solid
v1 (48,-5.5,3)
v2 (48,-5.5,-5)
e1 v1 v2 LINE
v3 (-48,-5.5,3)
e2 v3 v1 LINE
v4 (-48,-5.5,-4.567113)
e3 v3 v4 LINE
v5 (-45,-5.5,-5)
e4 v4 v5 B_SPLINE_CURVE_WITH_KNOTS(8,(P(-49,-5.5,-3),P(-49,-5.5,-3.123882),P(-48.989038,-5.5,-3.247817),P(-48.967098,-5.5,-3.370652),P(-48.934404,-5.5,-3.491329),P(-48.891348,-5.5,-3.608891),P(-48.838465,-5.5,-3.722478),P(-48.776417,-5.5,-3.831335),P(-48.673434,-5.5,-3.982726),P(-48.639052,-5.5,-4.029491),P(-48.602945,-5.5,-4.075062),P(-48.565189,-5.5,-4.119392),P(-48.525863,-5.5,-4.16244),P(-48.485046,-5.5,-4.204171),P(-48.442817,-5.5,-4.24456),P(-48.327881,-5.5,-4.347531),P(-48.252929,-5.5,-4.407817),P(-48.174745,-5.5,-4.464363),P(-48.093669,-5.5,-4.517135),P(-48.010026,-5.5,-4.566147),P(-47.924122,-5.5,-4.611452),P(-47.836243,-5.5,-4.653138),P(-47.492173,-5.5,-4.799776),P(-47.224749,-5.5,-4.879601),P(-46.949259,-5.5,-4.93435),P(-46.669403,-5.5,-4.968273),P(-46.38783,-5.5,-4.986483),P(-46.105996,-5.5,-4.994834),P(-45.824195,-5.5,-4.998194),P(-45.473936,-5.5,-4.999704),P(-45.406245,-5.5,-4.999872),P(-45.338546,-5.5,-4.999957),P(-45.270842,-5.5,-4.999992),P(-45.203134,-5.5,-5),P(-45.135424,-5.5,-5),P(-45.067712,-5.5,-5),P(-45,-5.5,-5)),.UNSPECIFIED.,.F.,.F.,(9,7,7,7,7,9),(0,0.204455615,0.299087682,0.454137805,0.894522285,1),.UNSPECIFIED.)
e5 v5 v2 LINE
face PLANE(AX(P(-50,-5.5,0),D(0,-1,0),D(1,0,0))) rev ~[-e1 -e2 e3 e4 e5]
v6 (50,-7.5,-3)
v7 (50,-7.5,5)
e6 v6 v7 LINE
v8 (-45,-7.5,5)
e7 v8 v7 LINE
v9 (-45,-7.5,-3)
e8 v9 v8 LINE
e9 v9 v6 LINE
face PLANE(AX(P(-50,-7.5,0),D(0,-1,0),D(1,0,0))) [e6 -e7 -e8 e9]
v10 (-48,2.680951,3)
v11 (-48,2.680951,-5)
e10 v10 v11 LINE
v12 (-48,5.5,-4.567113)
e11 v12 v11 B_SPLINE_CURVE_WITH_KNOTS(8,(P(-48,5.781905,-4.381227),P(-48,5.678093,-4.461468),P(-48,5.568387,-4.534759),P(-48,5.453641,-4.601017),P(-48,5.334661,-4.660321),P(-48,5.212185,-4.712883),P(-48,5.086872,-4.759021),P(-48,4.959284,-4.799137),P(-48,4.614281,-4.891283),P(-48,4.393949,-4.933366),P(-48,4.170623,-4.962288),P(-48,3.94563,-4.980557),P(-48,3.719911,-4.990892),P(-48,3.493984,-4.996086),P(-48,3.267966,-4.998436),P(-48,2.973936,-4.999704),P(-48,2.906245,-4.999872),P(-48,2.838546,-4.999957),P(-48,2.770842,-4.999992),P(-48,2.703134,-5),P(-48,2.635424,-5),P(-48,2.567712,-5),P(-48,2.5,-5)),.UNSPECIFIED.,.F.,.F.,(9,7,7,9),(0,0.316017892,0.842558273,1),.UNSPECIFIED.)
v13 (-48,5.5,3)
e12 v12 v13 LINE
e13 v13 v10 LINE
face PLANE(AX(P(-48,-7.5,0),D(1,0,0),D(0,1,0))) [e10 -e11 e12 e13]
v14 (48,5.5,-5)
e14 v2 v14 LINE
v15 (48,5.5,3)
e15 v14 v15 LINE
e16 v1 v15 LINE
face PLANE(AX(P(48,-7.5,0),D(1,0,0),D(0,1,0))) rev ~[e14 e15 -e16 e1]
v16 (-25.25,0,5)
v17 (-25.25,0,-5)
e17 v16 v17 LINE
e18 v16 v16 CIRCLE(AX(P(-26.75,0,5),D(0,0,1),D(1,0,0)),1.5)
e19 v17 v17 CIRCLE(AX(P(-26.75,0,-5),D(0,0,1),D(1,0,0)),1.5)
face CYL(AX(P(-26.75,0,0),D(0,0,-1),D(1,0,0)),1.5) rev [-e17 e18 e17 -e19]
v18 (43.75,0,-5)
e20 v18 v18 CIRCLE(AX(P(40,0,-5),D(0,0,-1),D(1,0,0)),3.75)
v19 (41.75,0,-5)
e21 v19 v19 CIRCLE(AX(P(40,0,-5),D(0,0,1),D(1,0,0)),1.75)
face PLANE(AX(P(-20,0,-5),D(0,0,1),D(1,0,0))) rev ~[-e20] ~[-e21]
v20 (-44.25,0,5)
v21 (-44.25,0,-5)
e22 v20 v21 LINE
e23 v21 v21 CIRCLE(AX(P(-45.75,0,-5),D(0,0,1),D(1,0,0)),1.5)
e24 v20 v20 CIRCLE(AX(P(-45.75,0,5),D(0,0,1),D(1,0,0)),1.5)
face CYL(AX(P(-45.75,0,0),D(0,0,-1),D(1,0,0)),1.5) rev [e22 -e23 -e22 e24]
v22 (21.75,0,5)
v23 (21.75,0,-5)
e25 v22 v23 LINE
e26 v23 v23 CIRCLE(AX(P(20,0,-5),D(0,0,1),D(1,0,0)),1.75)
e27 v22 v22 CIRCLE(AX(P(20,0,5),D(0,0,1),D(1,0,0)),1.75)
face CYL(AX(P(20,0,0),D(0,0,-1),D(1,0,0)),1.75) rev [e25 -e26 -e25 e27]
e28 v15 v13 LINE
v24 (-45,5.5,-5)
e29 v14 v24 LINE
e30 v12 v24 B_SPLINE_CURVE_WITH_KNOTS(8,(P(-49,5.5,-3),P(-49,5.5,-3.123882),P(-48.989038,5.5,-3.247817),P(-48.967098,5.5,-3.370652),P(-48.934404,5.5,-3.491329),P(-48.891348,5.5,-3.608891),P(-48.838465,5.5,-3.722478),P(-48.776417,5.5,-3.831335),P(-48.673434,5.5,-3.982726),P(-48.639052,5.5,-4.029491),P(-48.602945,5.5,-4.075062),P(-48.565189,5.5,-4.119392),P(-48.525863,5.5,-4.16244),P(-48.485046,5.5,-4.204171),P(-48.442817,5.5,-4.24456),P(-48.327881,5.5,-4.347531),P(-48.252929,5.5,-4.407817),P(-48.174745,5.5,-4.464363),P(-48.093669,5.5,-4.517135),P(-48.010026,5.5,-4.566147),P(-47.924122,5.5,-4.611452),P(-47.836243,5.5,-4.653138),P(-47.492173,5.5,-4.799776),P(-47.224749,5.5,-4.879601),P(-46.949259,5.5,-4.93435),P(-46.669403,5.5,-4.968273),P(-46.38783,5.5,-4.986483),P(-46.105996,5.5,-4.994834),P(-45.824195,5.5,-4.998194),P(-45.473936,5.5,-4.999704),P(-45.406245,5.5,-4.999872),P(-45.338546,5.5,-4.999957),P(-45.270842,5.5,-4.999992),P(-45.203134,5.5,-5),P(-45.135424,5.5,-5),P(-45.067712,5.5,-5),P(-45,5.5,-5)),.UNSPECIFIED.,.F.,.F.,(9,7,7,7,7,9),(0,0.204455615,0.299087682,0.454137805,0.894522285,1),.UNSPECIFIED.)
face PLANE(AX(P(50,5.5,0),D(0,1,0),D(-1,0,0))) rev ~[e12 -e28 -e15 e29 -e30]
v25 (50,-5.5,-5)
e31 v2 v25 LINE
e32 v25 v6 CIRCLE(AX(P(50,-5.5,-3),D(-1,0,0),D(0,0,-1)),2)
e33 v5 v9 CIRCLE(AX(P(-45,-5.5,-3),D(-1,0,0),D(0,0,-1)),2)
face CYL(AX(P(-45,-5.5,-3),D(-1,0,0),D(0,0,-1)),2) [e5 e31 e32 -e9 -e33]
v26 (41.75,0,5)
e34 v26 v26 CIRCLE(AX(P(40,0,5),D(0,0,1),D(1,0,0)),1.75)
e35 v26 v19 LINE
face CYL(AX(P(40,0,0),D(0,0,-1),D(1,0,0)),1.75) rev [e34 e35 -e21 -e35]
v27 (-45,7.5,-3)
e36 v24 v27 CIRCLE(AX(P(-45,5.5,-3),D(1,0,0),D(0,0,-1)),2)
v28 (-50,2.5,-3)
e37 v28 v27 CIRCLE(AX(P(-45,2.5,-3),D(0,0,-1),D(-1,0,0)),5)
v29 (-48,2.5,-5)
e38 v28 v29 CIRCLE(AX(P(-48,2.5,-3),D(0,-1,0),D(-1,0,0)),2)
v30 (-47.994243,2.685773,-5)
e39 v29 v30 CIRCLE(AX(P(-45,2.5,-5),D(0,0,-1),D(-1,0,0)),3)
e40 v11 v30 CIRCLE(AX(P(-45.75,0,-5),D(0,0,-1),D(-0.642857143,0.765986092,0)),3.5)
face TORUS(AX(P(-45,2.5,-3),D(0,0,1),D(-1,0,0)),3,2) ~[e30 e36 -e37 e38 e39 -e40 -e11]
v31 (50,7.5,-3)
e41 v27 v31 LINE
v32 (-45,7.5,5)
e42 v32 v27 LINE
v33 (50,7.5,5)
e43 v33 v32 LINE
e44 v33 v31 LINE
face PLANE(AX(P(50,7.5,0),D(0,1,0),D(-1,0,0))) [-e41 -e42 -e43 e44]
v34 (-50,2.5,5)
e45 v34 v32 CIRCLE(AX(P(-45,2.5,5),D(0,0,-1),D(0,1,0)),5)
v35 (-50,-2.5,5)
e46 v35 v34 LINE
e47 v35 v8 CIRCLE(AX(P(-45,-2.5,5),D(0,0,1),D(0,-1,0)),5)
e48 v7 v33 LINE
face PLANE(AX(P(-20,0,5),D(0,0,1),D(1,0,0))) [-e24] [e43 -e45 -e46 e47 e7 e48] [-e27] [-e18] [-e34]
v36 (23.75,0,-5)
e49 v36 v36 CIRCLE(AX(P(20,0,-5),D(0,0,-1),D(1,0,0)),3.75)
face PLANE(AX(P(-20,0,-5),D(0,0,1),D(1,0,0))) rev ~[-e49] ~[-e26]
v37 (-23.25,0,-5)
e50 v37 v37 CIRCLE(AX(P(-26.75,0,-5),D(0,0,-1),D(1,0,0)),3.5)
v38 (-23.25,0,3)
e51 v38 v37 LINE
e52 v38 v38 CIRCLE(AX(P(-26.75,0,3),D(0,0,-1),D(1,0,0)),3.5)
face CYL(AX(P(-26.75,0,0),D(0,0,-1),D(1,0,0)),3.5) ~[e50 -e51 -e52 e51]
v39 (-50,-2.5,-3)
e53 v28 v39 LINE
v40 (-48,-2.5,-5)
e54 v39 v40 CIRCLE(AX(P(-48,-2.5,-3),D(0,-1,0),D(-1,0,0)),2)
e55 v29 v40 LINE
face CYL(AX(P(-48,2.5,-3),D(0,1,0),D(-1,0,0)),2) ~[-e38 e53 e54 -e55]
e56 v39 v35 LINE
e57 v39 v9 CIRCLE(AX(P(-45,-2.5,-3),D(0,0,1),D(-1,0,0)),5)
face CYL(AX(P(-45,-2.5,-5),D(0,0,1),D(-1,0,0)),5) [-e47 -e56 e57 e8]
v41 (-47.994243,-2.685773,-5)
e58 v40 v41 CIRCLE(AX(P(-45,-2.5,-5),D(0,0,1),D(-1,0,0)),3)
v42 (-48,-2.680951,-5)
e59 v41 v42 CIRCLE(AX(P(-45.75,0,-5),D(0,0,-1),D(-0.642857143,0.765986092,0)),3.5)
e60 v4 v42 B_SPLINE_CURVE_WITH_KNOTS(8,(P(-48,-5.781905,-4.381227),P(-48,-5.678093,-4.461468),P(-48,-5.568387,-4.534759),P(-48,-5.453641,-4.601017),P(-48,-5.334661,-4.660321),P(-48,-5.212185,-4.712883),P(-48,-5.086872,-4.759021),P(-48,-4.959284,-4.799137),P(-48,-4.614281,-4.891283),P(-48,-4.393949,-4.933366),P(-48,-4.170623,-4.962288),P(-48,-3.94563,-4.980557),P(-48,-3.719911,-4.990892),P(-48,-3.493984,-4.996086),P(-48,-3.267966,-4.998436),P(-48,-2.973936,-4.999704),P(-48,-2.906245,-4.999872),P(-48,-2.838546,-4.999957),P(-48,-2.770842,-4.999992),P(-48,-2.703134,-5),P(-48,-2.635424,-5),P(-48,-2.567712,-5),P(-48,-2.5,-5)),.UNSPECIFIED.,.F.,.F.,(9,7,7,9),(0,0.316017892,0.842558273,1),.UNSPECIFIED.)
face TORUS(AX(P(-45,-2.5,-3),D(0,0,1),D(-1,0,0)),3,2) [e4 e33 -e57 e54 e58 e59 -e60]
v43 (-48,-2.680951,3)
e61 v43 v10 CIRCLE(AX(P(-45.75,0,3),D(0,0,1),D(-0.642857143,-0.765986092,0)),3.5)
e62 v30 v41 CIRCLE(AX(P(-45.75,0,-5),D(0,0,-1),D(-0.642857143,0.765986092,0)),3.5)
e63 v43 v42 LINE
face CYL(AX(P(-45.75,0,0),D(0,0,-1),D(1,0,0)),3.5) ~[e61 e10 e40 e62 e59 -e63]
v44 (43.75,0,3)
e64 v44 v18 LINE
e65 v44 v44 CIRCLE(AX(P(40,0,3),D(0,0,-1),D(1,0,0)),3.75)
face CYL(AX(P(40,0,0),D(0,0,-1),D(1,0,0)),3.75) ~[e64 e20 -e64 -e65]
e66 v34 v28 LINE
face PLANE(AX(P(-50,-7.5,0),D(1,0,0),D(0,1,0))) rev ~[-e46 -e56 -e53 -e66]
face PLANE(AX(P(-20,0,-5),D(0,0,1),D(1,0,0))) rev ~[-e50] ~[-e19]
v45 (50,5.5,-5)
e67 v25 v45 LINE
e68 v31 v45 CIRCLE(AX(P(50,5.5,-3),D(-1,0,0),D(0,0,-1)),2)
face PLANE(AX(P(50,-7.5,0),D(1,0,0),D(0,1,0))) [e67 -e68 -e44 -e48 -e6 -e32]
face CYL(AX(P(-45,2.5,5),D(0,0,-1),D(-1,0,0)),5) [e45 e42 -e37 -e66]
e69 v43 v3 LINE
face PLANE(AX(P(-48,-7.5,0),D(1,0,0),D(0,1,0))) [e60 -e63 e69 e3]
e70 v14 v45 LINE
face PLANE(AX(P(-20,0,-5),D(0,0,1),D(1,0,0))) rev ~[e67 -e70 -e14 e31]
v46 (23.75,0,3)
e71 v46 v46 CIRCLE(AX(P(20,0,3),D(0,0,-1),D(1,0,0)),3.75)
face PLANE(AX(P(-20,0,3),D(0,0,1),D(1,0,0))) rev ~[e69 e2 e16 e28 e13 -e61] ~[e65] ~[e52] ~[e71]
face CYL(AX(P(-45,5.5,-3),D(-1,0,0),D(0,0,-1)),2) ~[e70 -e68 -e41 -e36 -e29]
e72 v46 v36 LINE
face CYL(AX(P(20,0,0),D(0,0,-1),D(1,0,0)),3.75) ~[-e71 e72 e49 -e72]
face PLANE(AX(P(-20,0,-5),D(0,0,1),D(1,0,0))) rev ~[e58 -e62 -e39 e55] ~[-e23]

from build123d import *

# Parameters (mm, degrees)
F0_W        = 60
F0_H        = 15
F0_R        = 1.5
F0_W_2      = 40
F0_R_2      = 1.75
F1_DEPTH    = 5
F2_T        = -2
F3_R        = 5
F4_R        = 5
F5_T1_DEPTH = 100
F5_T3_DEPTH = 5
F5_T6_ANGLE = 90
F5_T8_ANGLE = 90


# Not quite as in the source:
# - a fillet or chamfer that OpenCascade refuses, or shapes differently, is made with other operations: its cross-section is extruded or revolved along the edge and cut away or added


with BuildPart() as f1:
    # F0 (on Top) → F1 (new body, symmetric)
    with BuildSketch(Plane.XY):
        with Locations((-20, 0)):
            Rectangle(F0_W, F0_H)
        with Locations((-45.75, 0)):
            Circle(F0_R, mode=Mode.SUBTRACT)
        with Locations((-26.75, 0)):
            Circle(F0_R, mode=Mode.SUBTRACT)
        with Locations((30, 0)):
            Rectangle(F0_W_2, F0_H)
        with Locations((20, 0)):
            Circle(F0_R_2, mode=Mode.SUBTRACT)
        with Locations((40, 0)):
            Circle(F0_R_2, mode=Mode.SUBTRACT)
    extrude(amount=F1_DEPTH, both=True)

    # F2
    f2_openings = [f1.faces().sort_by_distance(p)[0] for p in [
        (-0.04418, 0, -5),
    ]]
    offset(amount=F2_T, openings=f2_openings, kind=Kind.INTERSECTION)

    # F3
    f3_edges = [f1.edges().sort_by_distance(p)[0] for p in [
        (-50, -7.5, 0),
    ]]
    fillet(f3_edges, radius=F3_R)

    # F4
    f4_edges = [f1.edges().sort_by_distance(p)[0] for p in [
        (-50, 7.5, 0),
    ]]
    fillet(f4_edges, radius=F4_R)

    # F5: fillet of radius 2 on 1 edges, made by hand

    # F5_s2 → F5_t1 (cut)
    with BuildSketch(Plane.YZ.offset(-45)):
        with BuildLine():
            ThreePointArc((-5.5, -5), (-6.9142135624, -4.4142135624), (-7.5, -3))
            Line((-7.5, -3), (-7.5, -5))
            Line((-7.5, -5), (-5.5, -5))
        make_face()
        with BuildLine():
            ThreePointArc((5.5, -5), (6.9142135624, -4.4142135624), (7.5, -3))
            Line((7.5, -3), (7.5, -5))
            Line((7.5, -5), (5.5, -5))
        make_face()
    extrude(amount=F5_T1_DEPTH, mode=Mode.SUBTRACT)

    # F5_s4 → F5_t3 (cut)
    with BuildSketch(Plane.XZ.offset(-2.5)):
        with BuildLine():
            ThreePointArc((-50, -3), (-49.4142135624, -4.4142135624), (-48, -5))
            Line((-48, -5), (-50, -5))
            Line((-50, -5), (-50, -3))
        make_face()
    extrude(amount=F5_T3_DEPTH, mode=Mode.SUBTRACT)

    # F5_s5 → F5_t6 (revolve, cut)
    with BuildSketch(Plane.XZ.offset(2.5)):
        with BuildLine():
            ThreePointArc((-48, -5), (-49.4142135624, -4.4142135624), (-50, -3))
            Line((-50, -3), (-50, -5))
            Line((-50, -5), (-48, -5))
        make_face()
    revolve(axis=Axis((-45, -2.5, -5), (0, 0, 1)), revolution_arc=F5_T6_ANGLE, mode=Mode.SUBTRACT)

    # F5_s7 → F5_t8 (revolve, cut)
    with BuildSketch(Plane.XZ.offset(-2.5)):
        with BuildLine():
            ThreePointArc((-48, -5), (-49.4142135624, -4.4142135624), (-50, -3))
            Line((-50, -3), (-50, -5))
            Line((-50, -5), (-48, -5))
        make_face()
    revolve(axis=Axis((-45, 2.5, -5), (0, 0, -1)), revolution_arc=F5_T8_ANGLE, mode=Mode.SUBTRACT)


with BuildPart() as f6_1:
    # F6: copy of F1
    add(f1.part)


solid = f6_1.part
